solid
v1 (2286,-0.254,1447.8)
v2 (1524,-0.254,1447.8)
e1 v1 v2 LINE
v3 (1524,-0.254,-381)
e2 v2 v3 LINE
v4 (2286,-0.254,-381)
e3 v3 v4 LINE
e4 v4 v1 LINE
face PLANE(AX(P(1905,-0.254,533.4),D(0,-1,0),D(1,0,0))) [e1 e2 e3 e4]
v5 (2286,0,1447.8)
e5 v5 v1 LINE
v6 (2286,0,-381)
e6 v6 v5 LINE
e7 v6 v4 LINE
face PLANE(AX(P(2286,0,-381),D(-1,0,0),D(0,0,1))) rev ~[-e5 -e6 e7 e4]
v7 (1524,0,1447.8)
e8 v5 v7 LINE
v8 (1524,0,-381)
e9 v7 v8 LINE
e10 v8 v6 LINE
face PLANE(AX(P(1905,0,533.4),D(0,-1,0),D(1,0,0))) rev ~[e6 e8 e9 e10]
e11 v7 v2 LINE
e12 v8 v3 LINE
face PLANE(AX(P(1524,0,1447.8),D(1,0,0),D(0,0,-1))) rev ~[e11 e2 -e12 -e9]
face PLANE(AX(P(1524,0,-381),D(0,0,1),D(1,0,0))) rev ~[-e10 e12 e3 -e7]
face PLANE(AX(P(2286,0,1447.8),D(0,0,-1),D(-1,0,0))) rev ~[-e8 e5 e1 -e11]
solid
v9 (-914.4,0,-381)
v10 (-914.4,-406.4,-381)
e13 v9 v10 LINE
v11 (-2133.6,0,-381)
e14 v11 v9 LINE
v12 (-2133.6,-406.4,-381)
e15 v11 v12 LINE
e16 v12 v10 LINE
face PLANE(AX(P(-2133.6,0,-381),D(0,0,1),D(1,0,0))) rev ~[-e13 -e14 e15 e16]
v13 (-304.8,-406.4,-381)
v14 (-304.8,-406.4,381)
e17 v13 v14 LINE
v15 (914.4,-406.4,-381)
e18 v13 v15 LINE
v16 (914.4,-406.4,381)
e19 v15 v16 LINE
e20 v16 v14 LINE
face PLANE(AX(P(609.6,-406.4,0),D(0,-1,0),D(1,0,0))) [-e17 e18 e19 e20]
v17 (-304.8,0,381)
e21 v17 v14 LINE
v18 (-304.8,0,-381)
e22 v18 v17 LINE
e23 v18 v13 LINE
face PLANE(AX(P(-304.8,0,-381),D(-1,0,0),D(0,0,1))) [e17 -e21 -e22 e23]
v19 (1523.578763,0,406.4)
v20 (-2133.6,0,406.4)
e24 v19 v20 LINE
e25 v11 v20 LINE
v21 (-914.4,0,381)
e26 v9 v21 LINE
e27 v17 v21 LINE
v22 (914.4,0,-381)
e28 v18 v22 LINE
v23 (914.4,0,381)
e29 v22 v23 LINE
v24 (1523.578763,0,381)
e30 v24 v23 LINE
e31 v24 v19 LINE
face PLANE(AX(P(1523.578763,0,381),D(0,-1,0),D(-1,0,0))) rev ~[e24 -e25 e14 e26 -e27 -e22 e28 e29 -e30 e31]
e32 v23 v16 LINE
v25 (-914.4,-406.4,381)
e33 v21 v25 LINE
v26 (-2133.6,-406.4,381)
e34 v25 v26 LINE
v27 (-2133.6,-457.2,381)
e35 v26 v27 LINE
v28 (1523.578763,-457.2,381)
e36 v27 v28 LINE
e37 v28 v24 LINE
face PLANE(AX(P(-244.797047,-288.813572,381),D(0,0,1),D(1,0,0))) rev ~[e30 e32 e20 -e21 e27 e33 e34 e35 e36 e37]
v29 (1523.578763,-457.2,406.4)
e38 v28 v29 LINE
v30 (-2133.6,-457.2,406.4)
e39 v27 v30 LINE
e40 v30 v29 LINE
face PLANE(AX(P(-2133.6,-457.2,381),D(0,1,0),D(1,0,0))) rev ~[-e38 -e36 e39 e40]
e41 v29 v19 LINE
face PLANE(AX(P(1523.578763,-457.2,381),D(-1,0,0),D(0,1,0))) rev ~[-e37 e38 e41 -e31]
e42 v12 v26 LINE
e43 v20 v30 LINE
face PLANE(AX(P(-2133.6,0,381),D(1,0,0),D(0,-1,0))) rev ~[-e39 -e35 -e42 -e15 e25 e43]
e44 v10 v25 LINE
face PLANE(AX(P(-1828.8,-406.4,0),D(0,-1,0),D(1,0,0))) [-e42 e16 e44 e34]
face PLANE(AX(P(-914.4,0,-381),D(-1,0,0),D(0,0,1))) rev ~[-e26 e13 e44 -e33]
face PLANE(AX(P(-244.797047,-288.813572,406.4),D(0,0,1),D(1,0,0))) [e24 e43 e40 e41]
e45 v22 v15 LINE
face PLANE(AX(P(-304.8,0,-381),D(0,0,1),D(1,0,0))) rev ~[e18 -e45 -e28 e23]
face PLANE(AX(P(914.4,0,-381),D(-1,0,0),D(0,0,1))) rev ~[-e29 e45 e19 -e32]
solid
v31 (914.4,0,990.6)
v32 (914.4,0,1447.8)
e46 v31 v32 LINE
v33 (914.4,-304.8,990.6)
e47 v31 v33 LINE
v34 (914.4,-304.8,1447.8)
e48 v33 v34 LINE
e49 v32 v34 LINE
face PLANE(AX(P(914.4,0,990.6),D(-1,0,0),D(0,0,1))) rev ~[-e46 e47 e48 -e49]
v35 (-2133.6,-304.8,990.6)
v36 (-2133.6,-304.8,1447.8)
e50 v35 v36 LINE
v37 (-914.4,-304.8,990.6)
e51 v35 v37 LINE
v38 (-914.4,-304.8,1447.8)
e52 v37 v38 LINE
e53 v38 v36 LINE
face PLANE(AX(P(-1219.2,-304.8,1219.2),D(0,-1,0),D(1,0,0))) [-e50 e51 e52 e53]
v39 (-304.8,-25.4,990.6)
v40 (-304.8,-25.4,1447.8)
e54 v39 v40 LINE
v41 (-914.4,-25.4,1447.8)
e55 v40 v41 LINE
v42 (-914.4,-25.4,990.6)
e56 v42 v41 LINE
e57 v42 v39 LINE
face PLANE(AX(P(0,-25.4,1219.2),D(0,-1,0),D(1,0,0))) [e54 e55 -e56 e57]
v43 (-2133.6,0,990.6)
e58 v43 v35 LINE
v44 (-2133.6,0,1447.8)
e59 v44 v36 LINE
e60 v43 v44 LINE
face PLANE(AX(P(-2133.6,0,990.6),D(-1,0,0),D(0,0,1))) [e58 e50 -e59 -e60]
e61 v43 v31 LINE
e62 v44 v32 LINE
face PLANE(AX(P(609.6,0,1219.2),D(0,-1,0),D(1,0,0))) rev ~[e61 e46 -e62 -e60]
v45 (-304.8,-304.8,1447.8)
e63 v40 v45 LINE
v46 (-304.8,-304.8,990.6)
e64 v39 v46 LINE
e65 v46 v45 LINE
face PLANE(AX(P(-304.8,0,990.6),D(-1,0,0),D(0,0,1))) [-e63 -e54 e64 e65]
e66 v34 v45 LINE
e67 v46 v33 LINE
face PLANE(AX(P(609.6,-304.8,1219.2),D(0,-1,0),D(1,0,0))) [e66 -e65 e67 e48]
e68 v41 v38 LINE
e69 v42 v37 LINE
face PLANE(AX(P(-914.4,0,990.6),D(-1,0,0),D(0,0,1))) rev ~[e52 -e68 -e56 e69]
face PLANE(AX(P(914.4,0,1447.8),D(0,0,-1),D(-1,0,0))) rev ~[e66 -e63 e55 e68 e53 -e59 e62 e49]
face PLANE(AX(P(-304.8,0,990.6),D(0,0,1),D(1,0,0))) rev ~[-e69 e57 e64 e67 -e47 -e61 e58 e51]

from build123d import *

# Parameters (mm, degrees)
F0_W     = 609.6
F0_H     = 762
F1_DEPTH = 406.4
F2_DEPTH = 0.254
F0_H_2   = 457.2
F3_DEPTH = 304.8
F4_W     = 1219.2
F4_H     = 406.4
F5_DEPTH = 25.4
F6_DEPTH = 25.4


with BuildPart() as f1:
    # F0 (on Front) → F1 (new body)
    with BuildSketch(Plane.XZ):
        with Locations((609.6, 0)):
            Rectangle(F0_W, F0_H)
        Rectangle(F0_W, F0_H)
    extrude(amount=F1_DEPTH)



with BuildPart() as f1b:
    # F0 (on Front) → F1, piece 2 (new body)
    with BuildSketch(Plane.XZ):
        with Locations((-1828.8, 0)):
            Rectangle(F0_W, F0_H)
        with Locations((-1219.2, 0)):
            Rectangle(F0_W, F0_H)
    extrude(amount=F1_DEPTH)


with BuildPart() as f2:
    # F0 (on Front) → F2 (new body)
    with BuildSketch(Plane.XZ):
        Polygon((1524, 381), (1524, -381), (2286, -381), (2286, 1447.8), (1524, 1447.8), (1524, 990.6), align=None)
    extrude(amount=F2_DEPTH)


with BuildPart() as f3:
    # F0 (on Front) → F3 (new body)
    with BuildSketch(Plane.XZ):
        with Locations((-1219.2, 1219.2)):
            Rectangle(F0_W, F0_H_2)
        with Locations((-1828.8, 1219.2)):
            Rectangle(F0_W, F0_H_2)
    extrude(amount=F3_DEPTH)



with BuildPart() as f3b:
    # F0 (on Front) → F3, piece 2 (new body)
    with BuildSketch(Plane.XZ):
        with Locations((609.6, 1219.2)):
            Rectangle(F0_W, F0_H_2)
        with Locations((0, 1219.2)):
            Rectangle(F0_W, F0_H_2)
    extrude(amount=F3_DEPTH)


with BuildPart() as f1_1:
    add(f1.part)

    add(f1b.part)  # F5 merges F1b
    # F4 (on face) → F5 (join)
    with BuildSketch(Plane.XY.offset(381)):
        Polygon((1523.5787630081, -457.2), (1523.5787630081, 0), (-914.4, 0), (-914.4, -406.4), (-2133.6, -406.4), (-2133.6, -457.2), align=None)
        with Locations((-1524, -203.2)):
            Rectangle(F4_W, F4_H)
    extrude(amount=F5_DEPTH)


with BuildPart() as f3_1:
    add(f3.part)

    add(f3b.part)  # F6 merges F3b
    # F0 (on Front) → F6 (join)
    with BuildSketch(Plane.XZ):
        with Locations((0, 1219.2)):
            Rectangle(F0_W, F0_H_2)
        with Locations((-609.6, 1219.2)):
            Rectangle(F0_W, F0_H_2)
    extrude(amount=F6_DEPTH)


solid = Compound([f2.part, f1_1.part, f3_1.part])
